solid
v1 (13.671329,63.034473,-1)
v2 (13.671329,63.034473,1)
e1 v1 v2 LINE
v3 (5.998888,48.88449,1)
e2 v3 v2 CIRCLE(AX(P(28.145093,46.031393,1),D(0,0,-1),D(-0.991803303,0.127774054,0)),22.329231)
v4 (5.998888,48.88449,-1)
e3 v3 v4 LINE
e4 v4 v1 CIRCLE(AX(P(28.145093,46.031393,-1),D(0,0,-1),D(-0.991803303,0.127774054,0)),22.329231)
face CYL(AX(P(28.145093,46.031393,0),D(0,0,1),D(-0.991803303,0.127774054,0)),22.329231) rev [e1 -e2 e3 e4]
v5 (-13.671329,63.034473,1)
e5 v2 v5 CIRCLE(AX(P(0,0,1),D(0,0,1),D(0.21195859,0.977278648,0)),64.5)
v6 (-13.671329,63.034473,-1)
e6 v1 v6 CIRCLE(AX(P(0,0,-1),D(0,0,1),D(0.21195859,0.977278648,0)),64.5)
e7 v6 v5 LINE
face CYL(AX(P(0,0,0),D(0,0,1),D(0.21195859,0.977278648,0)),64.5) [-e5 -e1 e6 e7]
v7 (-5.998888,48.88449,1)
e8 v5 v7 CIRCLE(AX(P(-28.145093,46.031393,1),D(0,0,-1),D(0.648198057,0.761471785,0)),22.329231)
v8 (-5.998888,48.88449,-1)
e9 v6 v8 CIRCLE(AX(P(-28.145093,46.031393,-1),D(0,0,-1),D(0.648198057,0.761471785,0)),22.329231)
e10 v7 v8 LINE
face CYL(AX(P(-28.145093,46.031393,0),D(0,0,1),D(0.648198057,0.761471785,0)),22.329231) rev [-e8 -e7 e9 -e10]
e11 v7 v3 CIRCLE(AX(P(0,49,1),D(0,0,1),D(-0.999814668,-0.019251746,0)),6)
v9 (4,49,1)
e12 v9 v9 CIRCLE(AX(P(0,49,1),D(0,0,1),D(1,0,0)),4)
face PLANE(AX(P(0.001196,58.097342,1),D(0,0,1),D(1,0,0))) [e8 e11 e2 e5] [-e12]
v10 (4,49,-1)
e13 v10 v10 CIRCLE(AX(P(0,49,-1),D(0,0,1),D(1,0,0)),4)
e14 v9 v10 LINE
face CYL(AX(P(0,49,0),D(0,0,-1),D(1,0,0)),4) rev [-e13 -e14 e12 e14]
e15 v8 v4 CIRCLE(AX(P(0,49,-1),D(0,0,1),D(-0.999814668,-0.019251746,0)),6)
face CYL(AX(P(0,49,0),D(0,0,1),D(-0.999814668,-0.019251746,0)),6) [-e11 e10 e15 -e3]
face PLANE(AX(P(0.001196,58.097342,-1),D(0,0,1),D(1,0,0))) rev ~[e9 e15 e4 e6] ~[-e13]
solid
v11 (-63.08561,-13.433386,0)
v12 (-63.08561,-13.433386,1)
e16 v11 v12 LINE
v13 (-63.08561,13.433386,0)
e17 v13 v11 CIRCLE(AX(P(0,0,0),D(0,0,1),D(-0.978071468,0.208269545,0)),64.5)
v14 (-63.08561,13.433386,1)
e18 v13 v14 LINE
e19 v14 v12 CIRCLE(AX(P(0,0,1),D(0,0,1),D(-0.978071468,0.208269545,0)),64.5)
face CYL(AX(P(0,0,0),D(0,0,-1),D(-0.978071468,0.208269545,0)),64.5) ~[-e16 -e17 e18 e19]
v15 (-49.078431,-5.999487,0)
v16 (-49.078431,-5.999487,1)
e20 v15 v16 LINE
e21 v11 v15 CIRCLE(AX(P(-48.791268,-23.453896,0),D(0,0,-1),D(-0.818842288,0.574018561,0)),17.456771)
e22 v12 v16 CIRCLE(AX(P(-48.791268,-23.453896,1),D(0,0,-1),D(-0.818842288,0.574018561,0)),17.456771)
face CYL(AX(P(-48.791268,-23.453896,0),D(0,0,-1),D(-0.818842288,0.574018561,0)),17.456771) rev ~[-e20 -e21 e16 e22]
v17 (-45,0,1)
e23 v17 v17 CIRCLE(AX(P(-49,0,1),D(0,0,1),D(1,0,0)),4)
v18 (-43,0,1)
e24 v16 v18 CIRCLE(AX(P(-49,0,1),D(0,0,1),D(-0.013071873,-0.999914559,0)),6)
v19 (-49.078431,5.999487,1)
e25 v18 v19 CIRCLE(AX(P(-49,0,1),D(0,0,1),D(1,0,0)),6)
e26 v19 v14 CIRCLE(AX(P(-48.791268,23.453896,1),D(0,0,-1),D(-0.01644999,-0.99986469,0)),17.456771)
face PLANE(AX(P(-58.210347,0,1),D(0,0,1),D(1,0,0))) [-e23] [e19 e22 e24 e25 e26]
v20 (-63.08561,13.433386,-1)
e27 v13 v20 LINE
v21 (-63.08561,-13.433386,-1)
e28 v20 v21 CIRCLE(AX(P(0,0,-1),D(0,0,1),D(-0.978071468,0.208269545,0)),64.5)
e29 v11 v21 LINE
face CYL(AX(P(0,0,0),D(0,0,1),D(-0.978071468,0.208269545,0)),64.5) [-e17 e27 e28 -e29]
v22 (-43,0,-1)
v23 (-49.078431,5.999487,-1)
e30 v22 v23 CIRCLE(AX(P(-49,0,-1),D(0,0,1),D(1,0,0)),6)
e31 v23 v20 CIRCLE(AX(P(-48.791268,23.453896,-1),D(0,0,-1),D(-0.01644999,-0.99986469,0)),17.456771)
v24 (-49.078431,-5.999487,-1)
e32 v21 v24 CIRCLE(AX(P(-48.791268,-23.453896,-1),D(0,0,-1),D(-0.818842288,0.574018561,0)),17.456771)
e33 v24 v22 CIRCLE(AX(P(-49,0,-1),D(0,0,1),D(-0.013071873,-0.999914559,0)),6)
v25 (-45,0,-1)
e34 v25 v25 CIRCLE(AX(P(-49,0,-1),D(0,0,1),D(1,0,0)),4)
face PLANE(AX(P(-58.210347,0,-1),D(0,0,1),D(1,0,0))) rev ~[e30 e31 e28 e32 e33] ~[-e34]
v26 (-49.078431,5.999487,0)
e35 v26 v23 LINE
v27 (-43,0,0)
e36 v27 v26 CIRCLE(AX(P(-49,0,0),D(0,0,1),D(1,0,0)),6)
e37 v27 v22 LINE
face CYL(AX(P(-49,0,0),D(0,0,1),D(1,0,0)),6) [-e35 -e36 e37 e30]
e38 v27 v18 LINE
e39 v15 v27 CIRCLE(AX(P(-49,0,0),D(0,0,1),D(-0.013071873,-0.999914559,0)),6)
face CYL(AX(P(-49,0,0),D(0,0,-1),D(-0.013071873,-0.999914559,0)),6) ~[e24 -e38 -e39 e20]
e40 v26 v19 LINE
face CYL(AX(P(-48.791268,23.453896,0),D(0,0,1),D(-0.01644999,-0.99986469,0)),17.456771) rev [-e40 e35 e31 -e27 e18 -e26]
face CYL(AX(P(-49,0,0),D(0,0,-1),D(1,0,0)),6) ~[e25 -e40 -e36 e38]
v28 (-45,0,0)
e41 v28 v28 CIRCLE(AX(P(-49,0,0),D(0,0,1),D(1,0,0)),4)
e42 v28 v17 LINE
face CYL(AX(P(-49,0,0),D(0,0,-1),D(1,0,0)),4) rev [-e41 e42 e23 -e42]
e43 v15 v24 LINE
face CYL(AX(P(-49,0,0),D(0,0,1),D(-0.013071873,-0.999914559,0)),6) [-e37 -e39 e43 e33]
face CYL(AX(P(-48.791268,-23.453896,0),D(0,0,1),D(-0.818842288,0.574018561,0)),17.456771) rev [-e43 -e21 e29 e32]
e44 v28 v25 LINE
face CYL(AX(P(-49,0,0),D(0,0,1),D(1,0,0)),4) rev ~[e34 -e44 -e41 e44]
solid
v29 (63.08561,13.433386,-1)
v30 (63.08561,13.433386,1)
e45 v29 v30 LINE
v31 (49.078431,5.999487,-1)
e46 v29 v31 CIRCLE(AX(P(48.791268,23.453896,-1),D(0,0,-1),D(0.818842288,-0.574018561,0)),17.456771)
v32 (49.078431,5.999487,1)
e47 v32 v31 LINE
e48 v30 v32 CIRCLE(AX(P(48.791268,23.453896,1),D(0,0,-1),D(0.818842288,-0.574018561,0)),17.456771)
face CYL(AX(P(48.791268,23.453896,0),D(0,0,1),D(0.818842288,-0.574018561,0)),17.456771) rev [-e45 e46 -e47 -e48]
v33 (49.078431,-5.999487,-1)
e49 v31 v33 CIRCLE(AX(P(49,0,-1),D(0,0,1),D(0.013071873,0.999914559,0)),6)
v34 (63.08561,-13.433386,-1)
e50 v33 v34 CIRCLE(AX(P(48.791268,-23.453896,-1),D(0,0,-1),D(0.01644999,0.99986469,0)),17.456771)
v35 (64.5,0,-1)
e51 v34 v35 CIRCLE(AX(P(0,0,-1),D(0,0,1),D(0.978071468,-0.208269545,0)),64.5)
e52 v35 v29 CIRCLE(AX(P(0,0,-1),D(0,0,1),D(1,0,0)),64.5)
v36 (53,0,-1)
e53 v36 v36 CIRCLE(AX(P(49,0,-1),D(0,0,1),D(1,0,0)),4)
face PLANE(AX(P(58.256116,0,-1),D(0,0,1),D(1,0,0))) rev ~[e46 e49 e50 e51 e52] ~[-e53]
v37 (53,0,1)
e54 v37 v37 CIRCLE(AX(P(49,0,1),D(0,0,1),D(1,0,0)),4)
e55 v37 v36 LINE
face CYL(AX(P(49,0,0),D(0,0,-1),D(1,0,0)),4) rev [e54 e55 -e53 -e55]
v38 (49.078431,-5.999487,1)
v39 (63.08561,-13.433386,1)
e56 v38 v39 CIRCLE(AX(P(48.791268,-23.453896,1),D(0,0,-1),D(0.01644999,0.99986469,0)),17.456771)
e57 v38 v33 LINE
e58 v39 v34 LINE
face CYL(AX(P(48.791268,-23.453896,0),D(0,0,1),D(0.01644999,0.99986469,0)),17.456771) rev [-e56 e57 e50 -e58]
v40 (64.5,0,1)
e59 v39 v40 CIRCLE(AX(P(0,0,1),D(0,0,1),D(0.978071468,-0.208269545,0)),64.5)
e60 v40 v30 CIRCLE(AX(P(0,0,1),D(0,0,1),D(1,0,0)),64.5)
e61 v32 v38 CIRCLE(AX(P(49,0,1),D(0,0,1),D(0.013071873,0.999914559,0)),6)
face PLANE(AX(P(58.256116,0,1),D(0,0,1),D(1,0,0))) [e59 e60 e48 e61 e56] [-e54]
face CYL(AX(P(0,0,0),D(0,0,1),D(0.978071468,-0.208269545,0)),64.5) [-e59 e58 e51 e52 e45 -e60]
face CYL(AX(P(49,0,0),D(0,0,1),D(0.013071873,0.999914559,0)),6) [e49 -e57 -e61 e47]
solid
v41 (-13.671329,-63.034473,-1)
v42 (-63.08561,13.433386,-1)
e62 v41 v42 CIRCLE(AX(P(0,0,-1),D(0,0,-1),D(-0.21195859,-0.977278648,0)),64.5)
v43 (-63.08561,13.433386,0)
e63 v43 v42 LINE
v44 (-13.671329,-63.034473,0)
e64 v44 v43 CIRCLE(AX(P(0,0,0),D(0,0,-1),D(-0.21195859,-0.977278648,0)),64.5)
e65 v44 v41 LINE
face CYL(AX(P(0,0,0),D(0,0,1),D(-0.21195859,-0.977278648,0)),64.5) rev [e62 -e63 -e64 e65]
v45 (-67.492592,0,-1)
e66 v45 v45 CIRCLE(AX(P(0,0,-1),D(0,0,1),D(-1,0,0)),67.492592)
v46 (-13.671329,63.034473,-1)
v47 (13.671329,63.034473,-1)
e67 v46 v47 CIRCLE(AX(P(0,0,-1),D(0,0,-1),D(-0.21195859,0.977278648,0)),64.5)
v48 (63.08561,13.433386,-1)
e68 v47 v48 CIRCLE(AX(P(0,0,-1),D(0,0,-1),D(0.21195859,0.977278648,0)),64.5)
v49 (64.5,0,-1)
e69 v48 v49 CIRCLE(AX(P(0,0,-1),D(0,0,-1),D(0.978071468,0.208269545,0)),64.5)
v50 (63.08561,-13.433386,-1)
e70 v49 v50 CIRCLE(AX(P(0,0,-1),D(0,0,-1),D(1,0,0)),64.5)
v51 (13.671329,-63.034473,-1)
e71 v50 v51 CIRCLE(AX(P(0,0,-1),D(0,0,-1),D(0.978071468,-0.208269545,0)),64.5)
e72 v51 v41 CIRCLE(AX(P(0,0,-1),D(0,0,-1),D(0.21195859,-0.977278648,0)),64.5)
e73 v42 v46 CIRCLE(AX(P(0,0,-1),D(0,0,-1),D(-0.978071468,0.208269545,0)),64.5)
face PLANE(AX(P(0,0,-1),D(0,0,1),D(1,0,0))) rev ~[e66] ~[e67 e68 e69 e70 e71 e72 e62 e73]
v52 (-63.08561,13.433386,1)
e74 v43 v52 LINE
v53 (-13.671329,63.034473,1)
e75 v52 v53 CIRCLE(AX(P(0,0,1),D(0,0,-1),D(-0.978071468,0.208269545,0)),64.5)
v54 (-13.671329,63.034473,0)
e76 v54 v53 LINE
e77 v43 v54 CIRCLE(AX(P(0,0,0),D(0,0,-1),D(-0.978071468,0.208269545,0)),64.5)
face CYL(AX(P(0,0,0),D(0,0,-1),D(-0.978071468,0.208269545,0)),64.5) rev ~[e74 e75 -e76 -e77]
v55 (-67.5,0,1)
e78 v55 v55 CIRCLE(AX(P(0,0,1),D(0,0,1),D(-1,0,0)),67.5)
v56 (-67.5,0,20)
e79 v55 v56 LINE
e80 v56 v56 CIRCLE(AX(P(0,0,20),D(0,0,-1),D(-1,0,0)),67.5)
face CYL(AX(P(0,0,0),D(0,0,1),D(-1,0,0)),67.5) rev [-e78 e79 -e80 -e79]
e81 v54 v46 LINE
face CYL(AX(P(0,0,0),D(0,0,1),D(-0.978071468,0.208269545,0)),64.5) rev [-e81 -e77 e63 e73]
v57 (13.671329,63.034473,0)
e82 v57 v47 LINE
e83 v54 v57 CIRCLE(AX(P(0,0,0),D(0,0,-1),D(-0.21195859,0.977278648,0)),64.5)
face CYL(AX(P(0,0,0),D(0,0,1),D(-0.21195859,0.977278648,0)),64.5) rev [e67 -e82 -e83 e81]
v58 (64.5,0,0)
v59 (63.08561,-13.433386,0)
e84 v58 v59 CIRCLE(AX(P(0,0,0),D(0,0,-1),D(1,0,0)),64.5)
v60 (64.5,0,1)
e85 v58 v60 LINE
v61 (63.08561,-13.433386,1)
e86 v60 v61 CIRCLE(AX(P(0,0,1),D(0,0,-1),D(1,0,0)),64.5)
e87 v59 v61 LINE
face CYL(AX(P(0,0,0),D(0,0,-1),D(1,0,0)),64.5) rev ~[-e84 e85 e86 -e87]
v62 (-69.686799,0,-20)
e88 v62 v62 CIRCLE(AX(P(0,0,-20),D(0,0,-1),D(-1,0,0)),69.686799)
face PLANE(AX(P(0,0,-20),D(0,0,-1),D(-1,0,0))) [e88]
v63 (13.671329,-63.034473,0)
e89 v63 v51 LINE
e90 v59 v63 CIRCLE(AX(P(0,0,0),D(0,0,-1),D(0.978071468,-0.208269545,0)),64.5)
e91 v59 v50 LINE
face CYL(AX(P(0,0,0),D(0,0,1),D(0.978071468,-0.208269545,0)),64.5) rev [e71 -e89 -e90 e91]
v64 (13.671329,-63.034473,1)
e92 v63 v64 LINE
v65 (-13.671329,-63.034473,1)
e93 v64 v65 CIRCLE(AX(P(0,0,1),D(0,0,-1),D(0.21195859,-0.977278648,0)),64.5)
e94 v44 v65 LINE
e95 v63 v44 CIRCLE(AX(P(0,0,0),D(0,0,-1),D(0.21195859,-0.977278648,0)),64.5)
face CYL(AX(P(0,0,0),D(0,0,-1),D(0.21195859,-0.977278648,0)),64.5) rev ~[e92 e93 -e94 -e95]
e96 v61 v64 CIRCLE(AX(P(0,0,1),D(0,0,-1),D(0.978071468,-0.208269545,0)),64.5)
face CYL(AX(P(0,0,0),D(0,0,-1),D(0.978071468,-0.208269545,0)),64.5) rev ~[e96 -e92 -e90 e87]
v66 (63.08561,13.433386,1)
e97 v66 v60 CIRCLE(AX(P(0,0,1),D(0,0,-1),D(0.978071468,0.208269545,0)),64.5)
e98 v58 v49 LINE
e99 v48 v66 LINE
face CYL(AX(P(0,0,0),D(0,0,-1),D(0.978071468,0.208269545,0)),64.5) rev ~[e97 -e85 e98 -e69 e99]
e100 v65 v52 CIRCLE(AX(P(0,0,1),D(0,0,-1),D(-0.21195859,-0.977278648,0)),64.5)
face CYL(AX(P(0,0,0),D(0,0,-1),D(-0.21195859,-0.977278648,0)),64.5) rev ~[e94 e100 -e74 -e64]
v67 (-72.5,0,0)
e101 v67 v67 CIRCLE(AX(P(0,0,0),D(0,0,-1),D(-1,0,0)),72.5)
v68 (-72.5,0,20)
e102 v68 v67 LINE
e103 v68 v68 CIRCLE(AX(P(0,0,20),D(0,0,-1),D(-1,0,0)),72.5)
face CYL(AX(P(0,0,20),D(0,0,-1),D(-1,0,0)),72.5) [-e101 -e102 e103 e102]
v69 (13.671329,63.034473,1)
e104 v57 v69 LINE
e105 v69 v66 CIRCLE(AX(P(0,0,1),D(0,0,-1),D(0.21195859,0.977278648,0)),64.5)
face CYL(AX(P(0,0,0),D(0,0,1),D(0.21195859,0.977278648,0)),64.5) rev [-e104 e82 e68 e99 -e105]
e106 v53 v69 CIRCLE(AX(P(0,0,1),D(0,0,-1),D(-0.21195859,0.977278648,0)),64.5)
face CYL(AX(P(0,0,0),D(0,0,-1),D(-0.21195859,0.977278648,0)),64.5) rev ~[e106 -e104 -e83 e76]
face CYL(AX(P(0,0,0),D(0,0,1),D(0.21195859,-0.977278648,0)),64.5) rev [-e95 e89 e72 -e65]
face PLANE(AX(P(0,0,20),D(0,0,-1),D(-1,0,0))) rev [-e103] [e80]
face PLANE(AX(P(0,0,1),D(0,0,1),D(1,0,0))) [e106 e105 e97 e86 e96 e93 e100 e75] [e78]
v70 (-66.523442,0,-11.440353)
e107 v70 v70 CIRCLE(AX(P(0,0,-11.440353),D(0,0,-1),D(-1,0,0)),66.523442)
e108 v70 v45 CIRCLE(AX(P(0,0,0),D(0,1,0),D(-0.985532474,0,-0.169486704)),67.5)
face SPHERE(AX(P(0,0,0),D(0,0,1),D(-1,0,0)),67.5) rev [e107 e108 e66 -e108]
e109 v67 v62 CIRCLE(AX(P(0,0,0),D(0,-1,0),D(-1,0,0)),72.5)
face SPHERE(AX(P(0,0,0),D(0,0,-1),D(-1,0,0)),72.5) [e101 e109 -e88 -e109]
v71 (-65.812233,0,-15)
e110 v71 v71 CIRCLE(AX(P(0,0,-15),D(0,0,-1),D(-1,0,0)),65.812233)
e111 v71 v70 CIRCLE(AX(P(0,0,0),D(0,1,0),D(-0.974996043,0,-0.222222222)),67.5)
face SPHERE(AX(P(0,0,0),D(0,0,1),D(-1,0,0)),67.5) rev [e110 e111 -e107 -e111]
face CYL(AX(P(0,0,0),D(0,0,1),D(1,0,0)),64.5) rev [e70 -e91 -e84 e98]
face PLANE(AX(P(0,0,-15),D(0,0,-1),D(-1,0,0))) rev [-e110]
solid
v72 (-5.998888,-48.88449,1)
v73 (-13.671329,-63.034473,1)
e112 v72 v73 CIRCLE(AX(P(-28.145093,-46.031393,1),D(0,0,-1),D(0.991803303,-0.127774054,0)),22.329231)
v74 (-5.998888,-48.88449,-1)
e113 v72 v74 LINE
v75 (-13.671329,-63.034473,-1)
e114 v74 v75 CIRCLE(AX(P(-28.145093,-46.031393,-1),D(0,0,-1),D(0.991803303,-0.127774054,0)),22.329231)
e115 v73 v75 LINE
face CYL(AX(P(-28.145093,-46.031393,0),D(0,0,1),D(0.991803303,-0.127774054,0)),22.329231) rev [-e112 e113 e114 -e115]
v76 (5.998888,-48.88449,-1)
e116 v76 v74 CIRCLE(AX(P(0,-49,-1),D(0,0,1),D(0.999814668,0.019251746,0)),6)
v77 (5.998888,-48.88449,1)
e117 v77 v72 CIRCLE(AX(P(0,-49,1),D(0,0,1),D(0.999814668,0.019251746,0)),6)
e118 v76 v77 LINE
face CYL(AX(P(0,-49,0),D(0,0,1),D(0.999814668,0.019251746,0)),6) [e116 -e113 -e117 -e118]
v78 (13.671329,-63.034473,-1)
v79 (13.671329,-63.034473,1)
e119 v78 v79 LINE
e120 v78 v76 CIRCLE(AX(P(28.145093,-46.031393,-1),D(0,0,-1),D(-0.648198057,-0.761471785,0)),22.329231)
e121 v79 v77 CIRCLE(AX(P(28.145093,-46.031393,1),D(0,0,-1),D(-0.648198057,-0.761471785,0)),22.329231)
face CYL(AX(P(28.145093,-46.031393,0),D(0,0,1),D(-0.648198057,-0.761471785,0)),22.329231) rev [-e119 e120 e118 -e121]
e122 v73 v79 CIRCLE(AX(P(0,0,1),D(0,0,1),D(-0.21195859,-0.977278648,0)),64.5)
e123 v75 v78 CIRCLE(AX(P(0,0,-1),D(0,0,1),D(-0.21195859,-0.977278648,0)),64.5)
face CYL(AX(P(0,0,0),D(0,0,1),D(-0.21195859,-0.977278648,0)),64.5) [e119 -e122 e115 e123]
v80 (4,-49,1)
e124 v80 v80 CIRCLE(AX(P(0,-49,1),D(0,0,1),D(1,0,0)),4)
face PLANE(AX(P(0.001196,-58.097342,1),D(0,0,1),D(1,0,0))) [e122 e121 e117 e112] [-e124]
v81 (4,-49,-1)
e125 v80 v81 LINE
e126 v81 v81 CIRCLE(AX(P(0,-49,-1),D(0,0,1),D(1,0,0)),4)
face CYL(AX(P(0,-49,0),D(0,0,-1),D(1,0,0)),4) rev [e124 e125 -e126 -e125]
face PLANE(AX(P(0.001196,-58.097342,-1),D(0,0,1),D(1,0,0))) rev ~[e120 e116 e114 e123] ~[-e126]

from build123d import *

# Parameters (mm, degrees)
F0_R     = 4
F1_DEPTH = 1
F0_R_2   = 67.5
F3_DEPTH = 1


with BuildPart() as f1:
    # F0 (on Top) → F1 (new body, symmetric)
    with BuildSketch(Plane.XY):
        with BuildLine():
            ThreePointArc((63.085609693, -13.4333856366), (64.1454278386, -6.7538202079), (64.5, 0))
            ThreePointArc((64.5, 0), (64.1454278386, 6.7538202079), (63.085609693, 13.4333856366))
            ThreePointArc((63.085609693, 13.4333856366), (56.974835778, 8.034166581), (49.0784312352, 5.9994873565))
            ThreePointArc((49.0784312352, 5.9994873565), (53.2702802842, 4.2148198413), (55, 0))
            ThreePointArc((55, 0), (53.2702802842, -4.2148198413), (49.0784312352, -5.9994873565))
            ThreePointArc((49.0784312352, -5.9994873565), (56.974835778, -8.034166581), (63.085609693, -13.4333856366))
        make_face()
        with BuildLine():
            ThreePointArc((55, 0), (53.2702802842, 4.2148198413), (49.0784312352, 5.9994873565))
            ThreePointArc((49.0784312352, 5.9994873565), (43, 0), (49.0784312352, -5.9994873565))
            ThreePointArc((49.0784312352, -5.9994873565), (53.2702802842, -4.2148198413), (55, 0))
        make_face()
        with Locations((49, 0)):
            Circle(F0_R, mode=Mode.SUBTRACT)
    extrude(amount=F1_DEPTH, both=True)


with BuildPart() as f1b:
    # F0 (on Top) → F1, piece 2 (new body, symmetric)
    with BuildSketch(Plane.XY):
        with BuildLine():
            ThreePointArc((5.9988880077, 48.8844895219), (8.515751779, 56.6748662417), (13.671329053, 63.034472806))
            ThreePointArc((13.671329053, 63.034472806), (0, 64.5), (-13.671329053, 63.034472806))
            ThreePointArc((-13.671329053, 63.034472806), (-8.515751779, 56.6748662417), (-5.9988880077, 48.8844895219))
            ThreePointArc((-5.9988880077, 48.8844895219), (-0.0577579152, 54.9997219955), (6, 49))
            ThreePointArc((6, 49), (5.9997219955, 48.9422420848), (5.9988880077, 48.8844895219))
        make_face()
        with BuildLine():
            ThreePointArc((-5.9988880077, 48.8844895219), (0, 43), (5.9988880077, 48.8844895219))
            ThreePointArc((5.9988880077, 48.8844895219), (5.9997219955, 48.9422420848), (6, 49))
            ThreePointArc((6, 49), (-0.0577579152, 54.9997219955), (-5.9988880077, 48.8844895219))
        make_face()
        with Locations((0, 49)):
            Circle(F0_R, mode=Mode.SUBTRACT)
    extrude(amount=F1_DEPTH, both=True)


with BuildPart() as f1c:
    # F0 (on Top) → F1, piece 3 (new body, symmetric)
    with BuildSketch(Plane.XY):
        with BuildLine():
            ThreePointArc((-13.671329053, -63.034472806), (0, -64.5), (13.671329053, -63.034472806))
            ThreePointArc((13.671329053, -63.034472806), (8.515751779, -56.6748662417), (5.9988880077, -48.8844895219))
            ThreePointArc((5.9988880077, -48.8844895219), (5.9997219955, -48.9422420848), (6, -49))
            ThreePointArc((6, -49), (-0.0577579152, -54.9997219955), (-5.9988880077, -48.8844895219))
            ThreePointArc((-5.9988880077, -48.8844895219), (-8.515751779, -56.6748662417), (-13.671329053, -63.034472806))
        make_face()
        with BuildLine():
            ThreePointArc((6, -49), (5.9997219955, -48.9422420848), (5.9988880077, -48.8844895219))
            ThreePointArc((5.9988880077, -48.8844895219), (0, -43), (-5.9988880077, -48.8844895219))
            ThreePointArc((-5.9988880077, -48.8844895219), (-0.0577579152, -54.9997219955), (6, -49))
        make_face()
        with Locations((0, -49)):
            Circle(F0_R, mode=Mode.SUBTRACT)
    extrude(amount=F1_DEPTH, both=True)


with BuildPart() as f1d:
    # F0 (on Top) → F1, piece 4 (new body, symmetric)
    with BuildSketch(Plane.XY):
        with BuildLine():
            ThreePointArc((-49.0784312352, 5.9994873565), (-56.974835778, 8.034166581), (-63.085609693, 13.4333856366))
            ThreePointArc((-63.085609693, 13.4333856366), (-64.5, 0), (-63.085609693, -13.4333856366))
            ThreePointArc((-63.085609693, -13.4333856366), (-56.974835778, -8.034166581), (-49.0784312352, -5.9994873565))
            ThreePointArc((-49.0784312352, -5.9994873565), (-55, 0), (-49.0784312352, 5.9994873565))
        make_face()
        with BuildLine():
            ThreePointArc((-43, 0), (-44.7851801587, 4.2702802842), (-49.0784312352, 5.9994873565))
            ThreePointArc((-49.0784312352, 5.9994873565), (-55, 0), (-49.0784312352, -5.9994873565))
            ThreePointArc((-49.0784312352, -5.9994873565), (-44.7851801587, -4.2702802842), (-43, 0))
        make_face()
        with Locations((-49, 0)):
            Circle(F0_R, mode=Mode.SUBTRACT)
    extrude(amount=F1_DEPTH, both=True)


with BuildPart() as f3:
    # F0 (on Top) → F3 (new body, symmetric)
    with BuildSketch(Plane.XY):
        Circle(F0_R_2)
        with BuildLine():
            ThreePointArc((63.085609693, 13.4333856366), (64.1454278386, 6.7538202079), (64.5, 0))
            ThreePointArc((64.5, 0), (64.1454278386, -6.7538202079), (63.085609693, -13.4333856366))
            ThreePointArc((63.085609693, -13.4333856366), (45.6943527529, -45.5222596813), (13.671329053, -63.034472806))
            ThreePointArc((13.671329053, -63.034472806), (0, -64.5), (-13.671329053, -63.034472806))
            ThreePointArc((-13.671329053, -63.034472806), (-45.6943527529, -45.5222596813), (-63.085609693, -13.4333856366))
            ThreePointArc((-63.085609693, -13.4333856366), (-64.5, 0), (-63.085609693, 13.4333856366))
            ThreePointArc((-63.085609693, 13.4333856366), (-45.6943527529, 45.5222596813), (-13.671329053, 63.034472806))
            ThreePointArc((-13.671329053, 63.034472806), (0, 64.5), (13.671329053, 63.034472806))
            ThreePointArc((13.671329053, 63.034472806), (45.6943527529, 45.5222596813), (63.085609693, 13.4333856366))
        make_face(mode=Mode.SUBTRACT)
    extrude(amount=F3_DEPTH, both=True)

    # F2 (on Front) → F4 (revolve)
    with BuildSketch(Plane.XZ):
        with BuildLine():
            Line((0, -15), (-65.8122329054, -15))
            ThreePointArc((-65.8122329054, -15), (-66.1917705208, -13.2249580461), (-66.5234419851, -11.4403525492))
            ThreePointArc((-66.5234419851, -11.4403525492), (-67.215928307, -6.1861928378), (-67.4940807973, -0.893900067))
            ThreePointArc((-67.4940807973, -0.893900067), (-67.4985201831, -0.4469598323), (-67.5, 0))
            Line((-67.5, 0), (-67.5, 20))
            Line((-67.5, 20), (-72.5, 20))
            Line((-72.5, 20), (-72.5, 0))
            ThreePointArc((-72.5, 0), (-71.7932550835, -10.0984416873), (-69.6867993238, -20))
            Line((-69.6867993238, -20), (0, -20))
            Line((0, -20), (0, -15))
        make_face()
    revolve(axis=Axis((0, 0, 7.5), (0, 0, -1)))


solid = Compound([f1.part, f1b.part, f1c.part, f1d.part, f3.part])
